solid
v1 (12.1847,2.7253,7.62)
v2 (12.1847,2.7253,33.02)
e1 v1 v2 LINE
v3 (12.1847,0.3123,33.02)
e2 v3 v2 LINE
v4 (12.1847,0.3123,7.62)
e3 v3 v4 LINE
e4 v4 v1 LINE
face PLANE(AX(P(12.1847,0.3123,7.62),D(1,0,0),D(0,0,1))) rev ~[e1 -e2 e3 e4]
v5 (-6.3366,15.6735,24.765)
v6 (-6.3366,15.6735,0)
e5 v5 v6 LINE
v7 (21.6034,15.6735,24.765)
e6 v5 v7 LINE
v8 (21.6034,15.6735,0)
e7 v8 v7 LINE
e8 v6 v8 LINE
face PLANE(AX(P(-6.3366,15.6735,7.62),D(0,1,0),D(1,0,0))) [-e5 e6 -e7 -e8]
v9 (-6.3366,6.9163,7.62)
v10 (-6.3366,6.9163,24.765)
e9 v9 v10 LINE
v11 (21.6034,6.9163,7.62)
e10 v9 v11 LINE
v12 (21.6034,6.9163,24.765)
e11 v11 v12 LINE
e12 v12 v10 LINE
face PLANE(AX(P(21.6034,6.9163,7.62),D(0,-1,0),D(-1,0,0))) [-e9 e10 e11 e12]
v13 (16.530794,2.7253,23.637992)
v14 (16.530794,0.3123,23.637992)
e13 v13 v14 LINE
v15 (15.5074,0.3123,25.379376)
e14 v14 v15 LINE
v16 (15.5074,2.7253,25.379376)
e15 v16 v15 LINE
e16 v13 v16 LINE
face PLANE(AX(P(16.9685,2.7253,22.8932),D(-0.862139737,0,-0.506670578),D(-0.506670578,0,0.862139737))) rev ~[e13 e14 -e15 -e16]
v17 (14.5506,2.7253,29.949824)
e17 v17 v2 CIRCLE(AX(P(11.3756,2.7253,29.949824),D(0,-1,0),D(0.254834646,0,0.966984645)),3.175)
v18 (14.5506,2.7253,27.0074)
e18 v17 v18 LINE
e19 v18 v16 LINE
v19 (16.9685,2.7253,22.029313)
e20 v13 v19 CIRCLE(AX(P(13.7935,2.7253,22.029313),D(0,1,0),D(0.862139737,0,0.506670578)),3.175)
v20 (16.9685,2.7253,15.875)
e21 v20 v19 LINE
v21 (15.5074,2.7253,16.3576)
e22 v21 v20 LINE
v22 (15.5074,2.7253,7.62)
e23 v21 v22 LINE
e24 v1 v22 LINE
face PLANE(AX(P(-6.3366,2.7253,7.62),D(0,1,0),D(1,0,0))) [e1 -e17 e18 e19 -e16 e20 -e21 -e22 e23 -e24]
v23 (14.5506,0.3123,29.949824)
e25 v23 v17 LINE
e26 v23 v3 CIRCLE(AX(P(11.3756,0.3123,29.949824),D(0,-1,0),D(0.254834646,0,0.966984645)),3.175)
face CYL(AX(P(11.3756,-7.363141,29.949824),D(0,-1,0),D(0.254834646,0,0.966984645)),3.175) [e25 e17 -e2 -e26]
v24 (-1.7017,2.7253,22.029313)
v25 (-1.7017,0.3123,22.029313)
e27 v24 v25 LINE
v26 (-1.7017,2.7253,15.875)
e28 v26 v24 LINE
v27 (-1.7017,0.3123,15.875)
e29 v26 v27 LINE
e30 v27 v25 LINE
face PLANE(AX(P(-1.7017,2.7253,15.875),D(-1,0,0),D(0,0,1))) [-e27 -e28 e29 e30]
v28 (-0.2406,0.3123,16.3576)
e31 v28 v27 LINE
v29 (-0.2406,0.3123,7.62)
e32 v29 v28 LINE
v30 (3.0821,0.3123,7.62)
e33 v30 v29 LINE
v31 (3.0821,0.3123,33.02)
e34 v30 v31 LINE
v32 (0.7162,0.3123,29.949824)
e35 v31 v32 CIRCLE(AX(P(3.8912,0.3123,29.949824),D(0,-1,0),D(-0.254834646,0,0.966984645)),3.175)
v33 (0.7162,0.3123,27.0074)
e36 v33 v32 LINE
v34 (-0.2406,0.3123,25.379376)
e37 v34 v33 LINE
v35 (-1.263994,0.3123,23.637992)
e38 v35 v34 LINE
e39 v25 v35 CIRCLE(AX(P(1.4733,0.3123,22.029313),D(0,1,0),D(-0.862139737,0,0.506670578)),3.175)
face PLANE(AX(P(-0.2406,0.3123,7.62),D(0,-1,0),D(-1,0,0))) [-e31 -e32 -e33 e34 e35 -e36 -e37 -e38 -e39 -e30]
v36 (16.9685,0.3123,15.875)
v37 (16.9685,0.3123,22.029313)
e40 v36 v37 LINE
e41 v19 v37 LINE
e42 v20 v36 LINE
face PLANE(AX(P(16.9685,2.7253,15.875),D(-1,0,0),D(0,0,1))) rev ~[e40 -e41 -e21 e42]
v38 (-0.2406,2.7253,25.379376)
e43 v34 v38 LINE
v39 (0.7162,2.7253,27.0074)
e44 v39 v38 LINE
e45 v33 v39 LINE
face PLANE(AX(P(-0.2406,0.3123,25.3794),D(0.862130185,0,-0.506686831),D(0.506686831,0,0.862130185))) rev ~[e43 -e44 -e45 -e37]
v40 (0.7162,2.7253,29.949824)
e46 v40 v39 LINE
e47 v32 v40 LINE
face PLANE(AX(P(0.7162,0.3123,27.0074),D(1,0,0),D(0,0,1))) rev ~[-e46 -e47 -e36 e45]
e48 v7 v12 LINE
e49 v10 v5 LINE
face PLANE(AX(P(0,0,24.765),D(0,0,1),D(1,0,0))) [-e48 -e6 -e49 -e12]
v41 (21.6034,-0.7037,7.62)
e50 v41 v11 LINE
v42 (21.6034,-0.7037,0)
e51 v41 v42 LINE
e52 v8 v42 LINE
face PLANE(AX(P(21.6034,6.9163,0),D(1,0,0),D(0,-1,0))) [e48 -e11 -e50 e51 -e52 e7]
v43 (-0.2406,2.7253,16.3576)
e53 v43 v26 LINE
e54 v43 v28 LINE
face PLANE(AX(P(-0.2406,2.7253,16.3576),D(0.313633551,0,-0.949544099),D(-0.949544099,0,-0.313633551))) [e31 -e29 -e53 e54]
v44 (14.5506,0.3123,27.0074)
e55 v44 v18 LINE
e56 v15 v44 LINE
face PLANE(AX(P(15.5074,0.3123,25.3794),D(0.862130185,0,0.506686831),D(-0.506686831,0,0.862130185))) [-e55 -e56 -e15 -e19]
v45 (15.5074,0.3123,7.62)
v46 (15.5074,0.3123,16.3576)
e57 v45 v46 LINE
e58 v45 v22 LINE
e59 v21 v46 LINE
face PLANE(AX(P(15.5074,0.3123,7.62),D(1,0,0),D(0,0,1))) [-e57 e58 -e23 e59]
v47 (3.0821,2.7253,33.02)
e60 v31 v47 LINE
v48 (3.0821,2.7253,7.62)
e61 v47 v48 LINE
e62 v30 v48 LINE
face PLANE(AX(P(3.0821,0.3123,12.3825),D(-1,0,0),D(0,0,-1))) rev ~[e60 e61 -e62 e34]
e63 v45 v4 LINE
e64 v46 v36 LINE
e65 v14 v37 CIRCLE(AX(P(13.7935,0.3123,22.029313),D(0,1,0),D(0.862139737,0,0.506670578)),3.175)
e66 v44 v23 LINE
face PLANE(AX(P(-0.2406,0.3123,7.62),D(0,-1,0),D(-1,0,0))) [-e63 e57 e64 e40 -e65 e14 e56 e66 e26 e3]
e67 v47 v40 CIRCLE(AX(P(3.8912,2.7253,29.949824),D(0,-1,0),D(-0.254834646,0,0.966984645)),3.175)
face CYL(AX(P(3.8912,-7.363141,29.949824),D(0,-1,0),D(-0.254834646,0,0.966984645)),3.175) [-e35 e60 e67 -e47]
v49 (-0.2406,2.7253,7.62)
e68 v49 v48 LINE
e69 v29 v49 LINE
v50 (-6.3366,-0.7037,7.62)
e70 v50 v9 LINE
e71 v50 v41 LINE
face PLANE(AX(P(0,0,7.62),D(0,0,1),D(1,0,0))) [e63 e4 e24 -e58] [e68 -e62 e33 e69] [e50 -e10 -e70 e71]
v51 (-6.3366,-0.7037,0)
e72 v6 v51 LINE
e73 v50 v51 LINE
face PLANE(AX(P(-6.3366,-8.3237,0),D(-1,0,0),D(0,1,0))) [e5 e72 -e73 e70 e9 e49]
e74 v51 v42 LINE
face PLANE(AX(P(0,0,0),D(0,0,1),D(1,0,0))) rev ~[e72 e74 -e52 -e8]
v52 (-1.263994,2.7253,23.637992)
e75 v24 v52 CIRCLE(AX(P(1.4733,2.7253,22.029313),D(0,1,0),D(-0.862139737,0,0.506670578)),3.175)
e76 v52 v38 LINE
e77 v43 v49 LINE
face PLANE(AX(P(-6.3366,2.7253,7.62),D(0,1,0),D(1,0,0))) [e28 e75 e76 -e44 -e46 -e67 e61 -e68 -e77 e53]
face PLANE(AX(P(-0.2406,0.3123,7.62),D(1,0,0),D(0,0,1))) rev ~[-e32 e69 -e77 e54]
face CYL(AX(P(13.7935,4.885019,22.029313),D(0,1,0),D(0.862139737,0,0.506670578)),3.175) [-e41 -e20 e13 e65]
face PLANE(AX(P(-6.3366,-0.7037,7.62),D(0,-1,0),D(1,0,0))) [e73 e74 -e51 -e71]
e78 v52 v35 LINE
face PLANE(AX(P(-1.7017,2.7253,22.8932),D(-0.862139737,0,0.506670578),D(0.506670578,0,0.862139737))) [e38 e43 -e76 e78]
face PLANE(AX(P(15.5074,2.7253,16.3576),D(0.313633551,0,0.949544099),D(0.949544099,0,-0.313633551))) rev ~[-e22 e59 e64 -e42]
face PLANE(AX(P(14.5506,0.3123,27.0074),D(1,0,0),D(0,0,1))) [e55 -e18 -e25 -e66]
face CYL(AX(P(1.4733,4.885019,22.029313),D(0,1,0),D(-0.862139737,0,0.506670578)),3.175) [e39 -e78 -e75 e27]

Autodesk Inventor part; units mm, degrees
ref_plane "YZ Plane" through (0, 0, 0) normal (1, 0, 0) x (0, 1, 0)
ref_plane "XZ Plane" through (0, 0, 0) normal (0, 1, 0) x (-1, 0, 0)
ref_plane "XY Plane" through (0, 0, 0) normal (0, 0, 1) x (1, 0, 0)
sketch "Sketch1" plane through (0, 0, 0) normal (0, 0, 1) x (1, 0, 0)
  line L0 (-6.3366, 6.9163) -> (21.6034, 6.9163)
  line L1 (21.6034, 6.9163) -> (21.6034, -8.3237)
  line L2 (21.6034, -8.3237) -> (-6.3366, -8.3237)
  line L3 (-6.3366, -8.3237) -> (-6.3366, 6.9163)
  point P0 (0, 0)
  dimension "d0" = 27.94
  dimension "d1" = 15.24
extrude "Extrusion1" add sketch "Sketch1" along normal blind 7.62
sketch "Sketch2" plane through (0, 0, 7.62) normal (0, 0, 1) x (1, 0, 0)
  line L0 (-6.3366, 6.9163) -> (-6.3366, -8.3237) projected
  line L1 (21.6034, -8.3237) -> (21.6034, 6.9163) projected
  line L2 (21.6034, 0.3123) -> (21.6034, 2.7253)
  line L3 (-6.3366, 2.7253) -> (-6.3366, 0.3123)
  line L4 (21.6034, 6.9163) -> (-6.3366, 6.9163) projected
  line L5 (-6.3366, -8.3237) -> (21.6034, -8.3237) projected
  line L6 (0.9631, 2.7253) -> (-0.2406, 2.7253)
  line L7 (-0.2406, 0.3123) -> (0.9631, 0.3123)
  line L8 (-0.2406, 0.3123) -> (-0.2406, 2.7253)
  line L9 (-0.2406, 0.3123) -> (3.0821, 0.3123)
  line L10 (3.0821, 0.3123) -> (3.0821, 2.7253)
  line L11 (3.0821, 2.7253) -> (-0.2406, 2.7253)
  line L12 (-0.2406, 2.7253) -> (-0.2406, 0.3123)
  line L13 (14.3038, 2.7253) -> (15.5074, 2.7253)
  line L14 (15.5074, 0.3123) -> (14.3038, 0.3123)
  line L15 (15.5074, 0.3123) -> (15.5074, 2.7253)
  line L16 (15.5074, 0.3123) -> (12.1847, 0.3123)
  line L17 (12.1847, 0.3123) -> (12.1847, 2.7253)
  line L18 (12.1847, 2.7253) -> (15.5074, 2.7253)
  line L19 (15.5074, 2.7253) -> (15.5074, 0.3123)
  line L20 (-6.3366, -0.7037) -> (21.6034, -0.7037)
  line L21 (-6.3366, 2.7253) -> (21.6034, 2.7253)
  line L22 (21.6034, 2.7253) -> (21.6034, 0.3123)
  line L23 (21.6034, 0.3123) -> (-6.3366, 0.3123)
  line L24 (-6.3366, 0.3123) -> (-6.3366, 2.7253)
  point P0 (0, 0)
  point P1 (-0.2406, 1.5188)
  point P2 (15.2669, 0)
  point P3 (15.5074, 1.5188)
  dimension "d6" = 6.096
extrude "Extrusion2" add sketch "Sketch2" along normal blind 8.7376 contours L6 L11 L10 L9 L7 L8 | L15 L14 L16 L17 L18 L13
sketch "Sketch3" plane through (-0.2406, 2.7253, 7.62) normal (0, 1, 0) x (1, 0, 0)
  line L0 (3.3227, -8.7376) -> (0, -8.7376) projected
  line L1 (3.3227, -8.7376) -> (0, -8.7376)
  line L2 (-6.096, 7.62) -> (21.844, 7.62) projected
  line L3 (3.3227, -11.3552) -> (3.3227, -8.7376)
  line L4 (12.4253, -8.7376) -> (15.748, -8.7376)
  line L5 (12.4253, -8.7376) -> (15.748, -8.7376)
  line L6 (12.4253, -11.3552) -> (12.4253, -8.7376)
  line L7 (15.748, -8.7376) -> (17.2091, -8.255)
  line L8 (17.2091, -8.255) -> (17.2091, -15.2732)
  line L9 (17.2091, -15.2732) -> (14.9854, -19.057)
  line L10 (14.9854, -19.057) -> (12.4253, -19.057)
  line L11 (12.4253, -19.057) -> (12.4253, -8.7376)
  line L12 (7.874, 7.62) -> (7.874, -24.8322)
  line L13 (3.3227, -8.7376) -> (0, -8.7376)
  line L14 (3.3227, -8.7376) -> (0, -8.7376)
  line L15 (3.3227, -11.3552) -> (3.3227, -8.7376)
  line L16 (0, -8.7376) -> (-1.4611, -8.255)
  line L17 (-1.4611, -8.255) -> (-1.4611, -15.2732)
  line L18 (-1.4611, -15.2732) -> (0.7626, -19.057)
  line L19 (0.7626, -19.057) -> (3.3227, -19.057)
  line L20 (3.3227, -19.057) -> (3.3227, -8.7376)
  point P0 (0.2406, 7.62)
extrude "Extrusion4" add sketch "Sketch2" along normal blind 25.4 contours L6 L11 L10 L9 L7 L8 | L15 L14 L16 L17 L18 L13
sketch "Sketch4" plane through (-6.3366, 6.9163, 0) normal (0, 1, 0) x (1, 0, 0)
  point P0 (6.3366, 0)
sketch "Sketch5" plane through (0, 0, 7.62) normal (0, 0, 1) x (1, 0, 0)
  line L0 (21.6034, 6.9163) -> (-6.3366, 6.9163) projected
  line L1 (-6.3366, 15.6735) -> (21.6034, 15.6735)
  line L2 (21.6034, 15.6735) -> (21.6034, 6.9163)
  line L3 (21.6034, 6.9163) -> (-6.3366, 6.9163)
  line L4 (-6.3366, 6.9163) -> (-6.3366, 15.6735)
  point P0 (0, 0)
extrude "Extrusion5" add sketch "Sketch5" along normal blind 17.145 and the other way blind 7.62
extrude "Extrusion6" cut sketch "Sketch2" against normal blind 25.4 contours L20 L1 L5 L0
extrude "Extrusion7" add sketch "Sketch2" along normal blind 4.7625 contours L21 L8 L23 L0 | L1 L23 L15 L21 | L21 L17 L23 L10
extrude "Extrusion8" add sketch "Sketch3" against normal up to surface (2.413 mm away)
sketch "Sketch6" plane through (-6.3366, 0.3123, 7.62) normal (0, -1, 0) x (1, 0, 0)
  line L0 (27.94, 0) -> (27.94, 4.7625) projected
  line L1 (21.844, 4.7625) -> (21.844, 8.7376) projected
  line L2 (27.94, 0) -> (21.844, 0)
  line L3 (21.844, 0) -> (21.844, 4.7625)
  line L4 (21.844, 4.7625) -> (27.94, 4.7625)
  line L5 (27.94, 4.7625) -> (27.94, 0)
  line L6 (18.5213, 4.7625) -> (18.5213, 25.4) projected
  line L7 (18.5213, 4.7625) -> (9.4187, 4.7625)
  line L8 (9.4187, 4.7625) -> (9.4187, 0)
  line L9 (9.4187, 0) -> (18.5213, 0)
  line L10 (18.5213, 0) -> (18.5213, 4.7625)
  line L11 (6.096, 4.7625) -> (6.096, 8.7376) projected
  line L12 (0, 0) -> (0, 4.7625) projected
  line L13 (6.096, 4.7625) -> (0, 4.7625)
  line L14 (0, 4.7625) -> (0, 0)
  line L15 (0, 0) -> (6.096, 0)
  line L16 (6.096, 0) -> (6.096, 4.7625)
  point P0 (6.3366, -7.62)
  point P1 (18.5213, 19.057)
extrude "Extrusion9" cut sketch "Sketch6" against normal up to surface (6.604 mm away)
sketch "Sketch7" plane through (12.1847, 0.3123, 7.62) normal (0, -1, 0) x (1, 0, 0)
  line L0 (3.3227, 17.7594) -> (4.7838, 15.2732) projected
  line L1 (3.3227, 17.7594) -> (2.3659, 19.3874)
  line L2 (2.3659, 19.3874) -> (2.3659, 25.4)
  line L3 (3.3227, 25.4) -> (0, 25.4) projected
  line L4 (3.3227, 17.7594) -> (3.3227, 25.4) projected
  line L5 (2.3659, 25.4) -> (3.3227, 25.4)
  line L6 (3.3227, 25.4) -> (3.3227, 17.7594)
  line L7 (-18.5213, -7.62) -> (9.4187, -7.62) projected
  line L8 (-12.4253, 17.7594) -> (-11.4685, 19.3874)
  line L9 (-11.4685, 19.3874) -> (-11.4685, 25.4)
  line L10 (-12.4253, 17.7594) -> (-12.4253, 25.4)
  line L11 (-11.4685, 25.4) -> (-12.4253, 25.4)
  line L12 (-12.4253, 25.4) -> (-12.4253, 17.7594)
  point P0 (-12.1847, -7.62)
extrude "Extrusion10" cut sketch "Sketch7" against normal up to surface (6.604 mm away)
fillet "Fillet1" radius 3.175 4 edges at (0.7162, 1.5188, 33.02) (14.5507, 1.5188, 33.02) (16.9686, 1.5188, 22.8932) (-1.7017, 1.5188, 22.8932)
properties part number "Attachment1"
